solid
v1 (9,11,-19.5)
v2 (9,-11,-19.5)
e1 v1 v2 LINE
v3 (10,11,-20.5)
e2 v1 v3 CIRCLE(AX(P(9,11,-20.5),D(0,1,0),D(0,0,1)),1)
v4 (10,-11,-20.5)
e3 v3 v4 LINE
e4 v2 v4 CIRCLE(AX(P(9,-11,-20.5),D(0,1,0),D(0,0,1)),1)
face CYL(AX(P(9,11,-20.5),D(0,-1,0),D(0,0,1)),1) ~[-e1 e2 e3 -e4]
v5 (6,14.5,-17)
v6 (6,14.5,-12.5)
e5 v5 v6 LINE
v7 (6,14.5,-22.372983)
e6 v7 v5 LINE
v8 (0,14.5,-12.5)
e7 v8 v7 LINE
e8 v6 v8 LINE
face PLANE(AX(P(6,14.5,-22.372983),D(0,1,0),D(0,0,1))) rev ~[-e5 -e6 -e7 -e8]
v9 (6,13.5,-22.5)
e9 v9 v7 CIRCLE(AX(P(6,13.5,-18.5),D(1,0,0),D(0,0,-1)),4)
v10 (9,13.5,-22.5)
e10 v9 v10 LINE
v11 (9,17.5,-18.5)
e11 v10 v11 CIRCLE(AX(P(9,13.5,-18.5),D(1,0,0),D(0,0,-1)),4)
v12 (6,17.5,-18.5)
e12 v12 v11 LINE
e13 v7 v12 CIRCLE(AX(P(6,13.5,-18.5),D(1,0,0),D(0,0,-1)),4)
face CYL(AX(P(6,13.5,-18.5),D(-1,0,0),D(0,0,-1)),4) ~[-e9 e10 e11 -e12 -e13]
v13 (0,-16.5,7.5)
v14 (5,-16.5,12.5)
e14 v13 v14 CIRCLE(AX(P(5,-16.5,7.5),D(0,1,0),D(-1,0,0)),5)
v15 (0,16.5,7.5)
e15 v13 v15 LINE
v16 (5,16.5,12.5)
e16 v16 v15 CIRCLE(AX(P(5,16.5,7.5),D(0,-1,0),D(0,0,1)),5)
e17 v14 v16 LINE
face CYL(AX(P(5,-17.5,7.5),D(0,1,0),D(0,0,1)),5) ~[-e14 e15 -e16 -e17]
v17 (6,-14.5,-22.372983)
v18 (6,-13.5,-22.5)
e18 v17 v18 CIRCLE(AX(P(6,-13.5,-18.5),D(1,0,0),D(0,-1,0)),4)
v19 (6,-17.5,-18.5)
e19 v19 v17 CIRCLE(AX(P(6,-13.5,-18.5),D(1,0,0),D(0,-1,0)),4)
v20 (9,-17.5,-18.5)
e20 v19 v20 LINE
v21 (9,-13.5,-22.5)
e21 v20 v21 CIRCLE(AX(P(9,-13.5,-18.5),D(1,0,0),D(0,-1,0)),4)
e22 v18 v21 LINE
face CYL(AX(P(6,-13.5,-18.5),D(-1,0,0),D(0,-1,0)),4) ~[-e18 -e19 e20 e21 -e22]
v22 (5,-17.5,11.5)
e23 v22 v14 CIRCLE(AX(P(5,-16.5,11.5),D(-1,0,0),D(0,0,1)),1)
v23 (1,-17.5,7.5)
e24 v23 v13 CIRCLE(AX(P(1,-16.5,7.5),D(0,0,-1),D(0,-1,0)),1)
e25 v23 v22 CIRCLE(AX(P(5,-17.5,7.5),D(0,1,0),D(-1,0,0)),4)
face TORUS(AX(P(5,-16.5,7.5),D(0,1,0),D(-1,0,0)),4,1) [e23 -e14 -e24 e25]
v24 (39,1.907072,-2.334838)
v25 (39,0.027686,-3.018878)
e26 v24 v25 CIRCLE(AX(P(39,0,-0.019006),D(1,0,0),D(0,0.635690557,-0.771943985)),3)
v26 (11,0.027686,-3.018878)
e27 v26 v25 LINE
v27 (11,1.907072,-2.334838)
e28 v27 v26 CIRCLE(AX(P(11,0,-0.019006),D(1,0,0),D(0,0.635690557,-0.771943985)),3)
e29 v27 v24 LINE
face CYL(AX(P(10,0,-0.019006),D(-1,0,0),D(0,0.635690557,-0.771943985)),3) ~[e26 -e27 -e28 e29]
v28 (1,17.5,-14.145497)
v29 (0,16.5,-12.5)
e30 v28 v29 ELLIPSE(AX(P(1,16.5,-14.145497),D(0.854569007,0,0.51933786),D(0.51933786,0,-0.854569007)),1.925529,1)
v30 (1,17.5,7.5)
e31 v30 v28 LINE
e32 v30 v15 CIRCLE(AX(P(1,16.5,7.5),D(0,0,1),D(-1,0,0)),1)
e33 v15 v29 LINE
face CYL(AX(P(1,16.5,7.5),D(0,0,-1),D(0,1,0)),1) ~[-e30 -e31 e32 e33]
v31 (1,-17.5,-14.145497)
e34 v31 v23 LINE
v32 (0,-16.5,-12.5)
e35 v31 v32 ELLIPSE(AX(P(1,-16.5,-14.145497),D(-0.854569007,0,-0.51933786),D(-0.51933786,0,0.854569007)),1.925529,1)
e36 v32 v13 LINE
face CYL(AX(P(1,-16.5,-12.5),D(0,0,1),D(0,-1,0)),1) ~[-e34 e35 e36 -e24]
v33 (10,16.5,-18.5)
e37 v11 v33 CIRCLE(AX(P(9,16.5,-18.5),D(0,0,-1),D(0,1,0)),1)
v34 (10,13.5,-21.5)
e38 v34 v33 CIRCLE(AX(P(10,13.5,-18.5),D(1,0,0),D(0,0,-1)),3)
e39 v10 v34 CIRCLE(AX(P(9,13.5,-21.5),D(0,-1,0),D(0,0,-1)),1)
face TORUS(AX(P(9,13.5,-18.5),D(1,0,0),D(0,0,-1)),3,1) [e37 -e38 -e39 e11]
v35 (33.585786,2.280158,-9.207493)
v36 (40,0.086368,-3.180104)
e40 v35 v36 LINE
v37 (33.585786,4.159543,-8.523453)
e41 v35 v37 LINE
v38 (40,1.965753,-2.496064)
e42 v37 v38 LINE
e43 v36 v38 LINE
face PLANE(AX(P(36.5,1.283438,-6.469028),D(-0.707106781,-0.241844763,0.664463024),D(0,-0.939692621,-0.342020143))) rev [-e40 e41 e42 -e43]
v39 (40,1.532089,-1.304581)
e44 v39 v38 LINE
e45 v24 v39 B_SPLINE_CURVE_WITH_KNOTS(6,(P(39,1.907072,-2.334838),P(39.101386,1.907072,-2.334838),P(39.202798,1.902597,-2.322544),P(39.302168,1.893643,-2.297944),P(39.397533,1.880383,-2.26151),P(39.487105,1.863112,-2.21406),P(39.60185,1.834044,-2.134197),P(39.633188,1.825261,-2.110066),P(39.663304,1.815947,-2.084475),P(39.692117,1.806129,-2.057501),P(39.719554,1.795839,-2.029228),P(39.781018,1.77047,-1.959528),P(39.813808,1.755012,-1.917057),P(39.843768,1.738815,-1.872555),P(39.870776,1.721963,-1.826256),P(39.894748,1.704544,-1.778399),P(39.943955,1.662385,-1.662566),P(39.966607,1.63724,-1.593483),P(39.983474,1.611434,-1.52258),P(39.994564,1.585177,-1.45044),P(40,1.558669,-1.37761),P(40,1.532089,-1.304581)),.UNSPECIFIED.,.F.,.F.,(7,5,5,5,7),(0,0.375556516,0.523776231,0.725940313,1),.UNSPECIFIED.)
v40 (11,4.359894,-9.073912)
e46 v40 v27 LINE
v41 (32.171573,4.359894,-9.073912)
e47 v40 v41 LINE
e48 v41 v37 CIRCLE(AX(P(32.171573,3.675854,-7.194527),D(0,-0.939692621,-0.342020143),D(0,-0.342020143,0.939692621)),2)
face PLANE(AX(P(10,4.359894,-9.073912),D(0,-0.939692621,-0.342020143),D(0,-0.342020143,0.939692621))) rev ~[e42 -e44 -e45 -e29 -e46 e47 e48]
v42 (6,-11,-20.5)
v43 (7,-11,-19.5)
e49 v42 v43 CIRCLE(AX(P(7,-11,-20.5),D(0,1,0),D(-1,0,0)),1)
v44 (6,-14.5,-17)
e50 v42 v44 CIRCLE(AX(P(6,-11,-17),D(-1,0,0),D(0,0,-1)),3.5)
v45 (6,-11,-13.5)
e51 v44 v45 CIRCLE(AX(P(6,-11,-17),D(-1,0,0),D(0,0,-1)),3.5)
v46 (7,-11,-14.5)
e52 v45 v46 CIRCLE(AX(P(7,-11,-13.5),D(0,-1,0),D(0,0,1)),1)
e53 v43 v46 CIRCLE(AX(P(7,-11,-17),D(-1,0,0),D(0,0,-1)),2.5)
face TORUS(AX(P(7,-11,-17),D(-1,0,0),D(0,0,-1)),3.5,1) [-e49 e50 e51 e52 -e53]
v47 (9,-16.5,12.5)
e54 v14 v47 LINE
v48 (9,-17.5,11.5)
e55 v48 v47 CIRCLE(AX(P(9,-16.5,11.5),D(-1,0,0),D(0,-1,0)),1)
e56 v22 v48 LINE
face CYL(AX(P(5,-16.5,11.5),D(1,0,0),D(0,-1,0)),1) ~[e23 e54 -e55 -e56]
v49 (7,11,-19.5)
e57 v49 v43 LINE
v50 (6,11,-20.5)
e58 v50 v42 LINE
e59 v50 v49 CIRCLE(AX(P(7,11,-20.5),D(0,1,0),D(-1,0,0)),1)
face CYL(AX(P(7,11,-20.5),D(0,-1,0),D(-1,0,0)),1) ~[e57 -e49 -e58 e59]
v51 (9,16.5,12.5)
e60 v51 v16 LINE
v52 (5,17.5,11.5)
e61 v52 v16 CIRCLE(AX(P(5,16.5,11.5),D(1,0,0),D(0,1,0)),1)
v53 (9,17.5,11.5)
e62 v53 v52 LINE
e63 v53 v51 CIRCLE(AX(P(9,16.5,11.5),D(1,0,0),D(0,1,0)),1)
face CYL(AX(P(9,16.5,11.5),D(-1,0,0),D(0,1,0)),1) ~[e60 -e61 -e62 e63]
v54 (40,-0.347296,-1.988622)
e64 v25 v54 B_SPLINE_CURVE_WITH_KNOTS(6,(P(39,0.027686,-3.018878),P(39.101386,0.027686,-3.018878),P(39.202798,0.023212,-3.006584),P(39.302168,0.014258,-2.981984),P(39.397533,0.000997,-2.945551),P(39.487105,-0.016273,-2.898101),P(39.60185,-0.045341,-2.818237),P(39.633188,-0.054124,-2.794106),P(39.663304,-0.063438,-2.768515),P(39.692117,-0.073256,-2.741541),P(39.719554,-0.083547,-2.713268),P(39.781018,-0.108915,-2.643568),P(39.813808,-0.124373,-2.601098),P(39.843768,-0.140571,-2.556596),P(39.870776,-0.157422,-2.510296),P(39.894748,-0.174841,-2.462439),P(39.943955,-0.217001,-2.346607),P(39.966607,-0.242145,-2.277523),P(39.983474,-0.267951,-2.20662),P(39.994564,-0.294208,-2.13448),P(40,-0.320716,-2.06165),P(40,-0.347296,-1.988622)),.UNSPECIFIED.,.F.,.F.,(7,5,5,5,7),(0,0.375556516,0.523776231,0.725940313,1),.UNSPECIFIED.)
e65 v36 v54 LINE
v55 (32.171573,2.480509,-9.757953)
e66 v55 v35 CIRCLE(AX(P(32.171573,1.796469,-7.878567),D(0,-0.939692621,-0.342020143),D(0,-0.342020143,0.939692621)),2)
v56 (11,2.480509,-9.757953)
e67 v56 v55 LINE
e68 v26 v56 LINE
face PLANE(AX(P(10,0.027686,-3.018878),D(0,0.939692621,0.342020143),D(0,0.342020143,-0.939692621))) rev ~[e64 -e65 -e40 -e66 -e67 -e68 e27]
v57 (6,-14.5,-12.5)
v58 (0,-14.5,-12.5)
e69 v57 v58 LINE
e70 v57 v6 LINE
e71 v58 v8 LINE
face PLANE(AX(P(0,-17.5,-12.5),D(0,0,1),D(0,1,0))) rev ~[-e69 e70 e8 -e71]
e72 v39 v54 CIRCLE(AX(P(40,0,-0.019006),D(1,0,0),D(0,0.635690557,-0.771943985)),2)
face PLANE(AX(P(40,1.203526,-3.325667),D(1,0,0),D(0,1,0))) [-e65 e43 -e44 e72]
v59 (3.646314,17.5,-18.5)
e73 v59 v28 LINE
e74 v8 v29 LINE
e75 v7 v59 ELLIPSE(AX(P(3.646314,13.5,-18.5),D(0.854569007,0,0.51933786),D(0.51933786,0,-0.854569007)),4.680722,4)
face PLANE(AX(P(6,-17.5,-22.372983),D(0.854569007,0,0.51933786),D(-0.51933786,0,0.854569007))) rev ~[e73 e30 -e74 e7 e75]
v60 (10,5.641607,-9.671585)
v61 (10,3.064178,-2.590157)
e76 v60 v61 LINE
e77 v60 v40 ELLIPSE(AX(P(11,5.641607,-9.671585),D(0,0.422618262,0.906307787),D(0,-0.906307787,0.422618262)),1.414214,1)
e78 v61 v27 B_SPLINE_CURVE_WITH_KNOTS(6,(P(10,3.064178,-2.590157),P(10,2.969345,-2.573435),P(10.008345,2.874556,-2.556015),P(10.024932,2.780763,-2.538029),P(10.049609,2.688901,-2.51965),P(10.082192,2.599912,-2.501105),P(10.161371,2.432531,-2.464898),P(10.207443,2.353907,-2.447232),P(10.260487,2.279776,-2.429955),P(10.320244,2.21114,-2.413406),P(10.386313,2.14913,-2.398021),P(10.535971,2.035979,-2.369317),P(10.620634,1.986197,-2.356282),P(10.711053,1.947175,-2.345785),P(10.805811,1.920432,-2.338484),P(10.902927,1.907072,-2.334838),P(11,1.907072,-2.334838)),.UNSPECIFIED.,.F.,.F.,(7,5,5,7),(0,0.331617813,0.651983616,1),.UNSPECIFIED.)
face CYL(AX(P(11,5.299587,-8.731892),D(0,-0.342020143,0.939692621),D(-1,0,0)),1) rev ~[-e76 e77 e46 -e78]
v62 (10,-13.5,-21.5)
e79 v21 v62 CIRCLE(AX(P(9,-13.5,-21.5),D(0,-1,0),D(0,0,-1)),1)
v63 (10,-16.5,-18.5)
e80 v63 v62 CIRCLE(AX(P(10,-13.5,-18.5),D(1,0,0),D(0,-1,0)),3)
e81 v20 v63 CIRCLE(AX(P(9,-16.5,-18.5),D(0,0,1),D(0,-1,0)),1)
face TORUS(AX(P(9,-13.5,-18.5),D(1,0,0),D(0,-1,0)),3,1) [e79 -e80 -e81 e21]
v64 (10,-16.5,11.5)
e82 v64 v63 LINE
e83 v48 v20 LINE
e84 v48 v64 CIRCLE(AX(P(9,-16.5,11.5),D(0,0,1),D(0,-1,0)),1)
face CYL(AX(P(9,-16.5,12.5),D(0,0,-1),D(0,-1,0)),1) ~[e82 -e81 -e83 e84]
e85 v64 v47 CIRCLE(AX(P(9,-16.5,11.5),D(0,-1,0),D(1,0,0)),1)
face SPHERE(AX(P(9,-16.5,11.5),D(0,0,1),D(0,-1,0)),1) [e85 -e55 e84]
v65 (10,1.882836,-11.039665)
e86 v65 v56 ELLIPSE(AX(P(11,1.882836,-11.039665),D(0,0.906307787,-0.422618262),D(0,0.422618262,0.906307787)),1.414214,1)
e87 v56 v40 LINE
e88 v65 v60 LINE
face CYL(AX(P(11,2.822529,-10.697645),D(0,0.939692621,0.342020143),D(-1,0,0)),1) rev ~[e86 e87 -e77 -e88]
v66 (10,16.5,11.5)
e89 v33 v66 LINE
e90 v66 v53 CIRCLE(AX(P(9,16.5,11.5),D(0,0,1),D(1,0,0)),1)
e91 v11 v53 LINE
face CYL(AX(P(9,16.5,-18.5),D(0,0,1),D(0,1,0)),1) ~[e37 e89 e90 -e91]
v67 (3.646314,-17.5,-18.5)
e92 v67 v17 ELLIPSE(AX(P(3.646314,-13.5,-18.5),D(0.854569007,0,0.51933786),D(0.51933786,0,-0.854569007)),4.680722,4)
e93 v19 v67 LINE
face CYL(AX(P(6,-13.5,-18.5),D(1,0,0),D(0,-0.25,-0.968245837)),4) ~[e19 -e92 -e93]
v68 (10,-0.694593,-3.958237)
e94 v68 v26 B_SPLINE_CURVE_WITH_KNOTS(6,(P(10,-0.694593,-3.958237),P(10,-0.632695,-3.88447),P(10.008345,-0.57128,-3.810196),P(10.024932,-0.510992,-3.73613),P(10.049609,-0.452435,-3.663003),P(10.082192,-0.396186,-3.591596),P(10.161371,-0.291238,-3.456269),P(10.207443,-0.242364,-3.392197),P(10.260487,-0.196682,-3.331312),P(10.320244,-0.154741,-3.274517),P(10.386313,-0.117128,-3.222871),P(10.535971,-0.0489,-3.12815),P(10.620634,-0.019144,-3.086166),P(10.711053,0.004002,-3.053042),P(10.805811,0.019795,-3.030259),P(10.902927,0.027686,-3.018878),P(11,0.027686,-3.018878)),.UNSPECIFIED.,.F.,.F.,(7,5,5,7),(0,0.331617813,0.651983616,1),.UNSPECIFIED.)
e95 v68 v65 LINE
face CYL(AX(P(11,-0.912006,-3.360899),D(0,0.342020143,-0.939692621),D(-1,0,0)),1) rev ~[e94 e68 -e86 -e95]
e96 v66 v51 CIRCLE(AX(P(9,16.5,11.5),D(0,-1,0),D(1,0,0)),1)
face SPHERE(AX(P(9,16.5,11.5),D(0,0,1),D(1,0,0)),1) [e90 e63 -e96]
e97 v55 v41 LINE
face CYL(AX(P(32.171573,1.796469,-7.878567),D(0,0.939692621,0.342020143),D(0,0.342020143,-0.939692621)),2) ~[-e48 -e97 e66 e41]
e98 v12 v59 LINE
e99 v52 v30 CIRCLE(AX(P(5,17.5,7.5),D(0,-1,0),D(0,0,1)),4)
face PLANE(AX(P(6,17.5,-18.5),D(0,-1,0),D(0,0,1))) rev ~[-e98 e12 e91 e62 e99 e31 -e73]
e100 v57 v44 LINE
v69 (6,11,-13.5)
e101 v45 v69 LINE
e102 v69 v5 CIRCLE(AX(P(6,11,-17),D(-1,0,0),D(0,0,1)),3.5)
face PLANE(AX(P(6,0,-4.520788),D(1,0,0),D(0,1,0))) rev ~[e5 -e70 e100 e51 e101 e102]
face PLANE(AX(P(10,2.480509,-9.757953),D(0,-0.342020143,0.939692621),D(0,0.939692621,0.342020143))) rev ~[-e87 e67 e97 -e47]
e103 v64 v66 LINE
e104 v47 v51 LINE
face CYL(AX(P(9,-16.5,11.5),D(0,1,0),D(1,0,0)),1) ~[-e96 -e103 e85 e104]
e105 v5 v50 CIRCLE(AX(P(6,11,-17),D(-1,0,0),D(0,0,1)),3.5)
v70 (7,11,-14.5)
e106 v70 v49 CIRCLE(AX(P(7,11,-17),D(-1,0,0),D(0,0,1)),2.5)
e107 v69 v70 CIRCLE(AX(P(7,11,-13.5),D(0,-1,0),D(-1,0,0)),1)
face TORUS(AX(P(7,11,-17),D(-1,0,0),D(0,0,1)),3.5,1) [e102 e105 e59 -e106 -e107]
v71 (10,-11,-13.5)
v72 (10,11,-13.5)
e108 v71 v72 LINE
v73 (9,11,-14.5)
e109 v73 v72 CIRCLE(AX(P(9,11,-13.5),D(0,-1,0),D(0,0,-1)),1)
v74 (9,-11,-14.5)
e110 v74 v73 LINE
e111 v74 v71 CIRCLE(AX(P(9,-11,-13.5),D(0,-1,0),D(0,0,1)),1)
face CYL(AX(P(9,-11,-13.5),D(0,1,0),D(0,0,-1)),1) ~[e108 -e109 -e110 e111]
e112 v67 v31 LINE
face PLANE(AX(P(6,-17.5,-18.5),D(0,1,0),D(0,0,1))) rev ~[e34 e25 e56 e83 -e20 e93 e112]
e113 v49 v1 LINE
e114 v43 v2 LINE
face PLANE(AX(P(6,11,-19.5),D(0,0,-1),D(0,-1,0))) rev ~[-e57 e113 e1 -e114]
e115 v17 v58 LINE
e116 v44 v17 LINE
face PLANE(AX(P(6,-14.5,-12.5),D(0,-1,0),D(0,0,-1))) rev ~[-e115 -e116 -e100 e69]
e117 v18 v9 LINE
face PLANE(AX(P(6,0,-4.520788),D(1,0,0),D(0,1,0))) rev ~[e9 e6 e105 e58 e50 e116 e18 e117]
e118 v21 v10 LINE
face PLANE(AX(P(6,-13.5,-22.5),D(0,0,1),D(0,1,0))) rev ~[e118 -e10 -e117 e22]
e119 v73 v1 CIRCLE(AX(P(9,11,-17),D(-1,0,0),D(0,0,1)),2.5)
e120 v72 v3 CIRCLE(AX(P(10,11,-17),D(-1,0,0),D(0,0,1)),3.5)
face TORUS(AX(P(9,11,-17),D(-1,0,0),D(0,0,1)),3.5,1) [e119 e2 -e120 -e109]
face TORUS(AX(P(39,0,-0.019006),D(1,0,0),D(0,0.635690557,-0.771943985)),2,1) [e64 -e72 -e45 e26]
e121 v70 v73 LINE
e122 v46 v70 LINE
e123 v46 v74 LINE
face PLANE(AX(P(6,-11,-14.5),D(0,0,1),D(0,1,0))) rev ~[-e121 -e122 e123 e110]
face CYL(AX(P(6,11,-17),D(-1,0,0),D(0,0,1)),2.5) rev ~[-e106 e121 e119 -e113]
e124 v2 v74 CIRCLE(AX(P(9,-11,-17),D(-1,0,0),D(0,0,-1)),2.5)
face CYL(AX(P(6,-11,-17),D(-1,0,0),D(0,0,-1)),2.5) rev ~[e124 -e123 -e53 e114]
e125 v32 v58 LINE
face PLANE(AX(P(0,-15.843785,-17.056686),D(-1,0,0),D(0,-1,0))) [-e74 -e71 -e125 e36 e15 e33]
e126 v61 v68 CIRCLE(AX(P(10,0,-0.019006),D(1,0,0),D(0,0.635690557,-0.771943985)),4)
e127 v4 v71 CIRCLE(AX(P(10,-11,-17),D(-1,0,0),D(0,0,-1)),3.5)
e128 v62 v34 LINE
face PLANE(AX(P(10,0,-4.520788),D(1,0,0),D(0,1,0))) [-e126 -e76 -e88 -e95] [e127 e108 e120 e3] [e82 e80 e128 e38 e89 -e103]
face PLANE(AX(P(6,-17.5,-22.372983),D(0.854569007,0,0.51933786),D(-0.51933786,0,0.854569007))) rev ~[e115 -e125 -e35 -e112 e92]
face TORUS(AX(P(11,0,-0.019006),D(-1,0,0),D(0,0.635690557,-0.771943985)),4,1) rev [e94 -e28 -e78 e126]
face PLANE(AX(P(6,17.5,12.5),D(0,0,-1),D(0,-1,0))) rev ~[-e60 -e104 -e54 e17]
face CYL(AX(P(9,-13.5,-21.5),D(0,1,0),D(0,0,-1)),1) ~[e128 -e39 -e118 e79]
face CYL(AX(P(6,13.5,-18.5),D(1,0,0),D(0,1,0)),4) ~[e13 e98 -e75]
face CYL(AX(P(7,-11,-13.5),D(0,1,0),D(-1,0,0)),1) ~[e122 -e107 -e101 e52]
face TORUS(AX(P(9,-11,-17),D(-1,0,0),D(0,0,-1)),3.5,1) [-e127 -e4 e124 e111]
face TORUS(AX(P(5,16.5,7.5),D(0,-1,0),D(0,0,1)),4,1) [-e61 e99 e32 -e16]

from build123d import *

# Parameters (mm, degrees)
F0_W      = 35
F0_H      = 25
F1_DEPTH  = 6
F3_DEPTH  = 4
F4_R      = 1
F6_DEPTH  = 6
F8_DEPTH  = 35.001
F10_DEPTH = 30
F11_SIZE  = 7
F12_R     = 2
F13_R     = 5
F14_R     = 1
F15_R     = 1


with BuildPart() as f1:
    # F0 (on Right) → F1 (new body)
    with BuildSketch(Plane.YZ):
        Rectangle(F0_W, F0_H)
    extrude(amount=F1_DEPTH)

    # F2 (on face) → F3 (join)
    with BuildSketch(Plane.YZ.offset(6)):
        with BuildLine():
            Line((17.5, 12.5), (-17.5, 12.5))
            Line((-17.5, 12.5), (-17.5, -18.5))
            ThreePointArc((-17.5, -18.5), (-16.3284271247, -21.3284271247), (-13.5, -22.5))
            Line((-13.5, -22.5), (13.5, -22.5))
            ThreePointArc((13.5, -22.5), (16.3284271247, -21.3284271247), (17.5, -18.5))
            Line((17.5, -18.5), (17.5, 12.5))
        make_face()
        with BuildLine():
            ThreePointArc((-11, -19.5), (-13.5, -17), (-11, -14.5))
            Line((-11, -14.5), (11, -14.5))
            ThreePointArc((11, -14.5), (13.5, -17), (11, -19.5))
            Line((11, -19.5), (-11, -19.5))
        make_face(mode=Mode.SUBTRACT)
    extrude(amount=F3_DEPTH)

    # F4
    f4_edges = [f1.edges().sort_by_distance(p)[0] for p in [
        (10, -16.328427, -21.328427),
        (10, 0, -19.5),
        (6, 0, -19.5),
    ]]
    fillet(f4_edges, radius=F4_R)

    # F5 (on face) → F6 (join, through all)
    with BuildSketch(Plane(origin=(6, 0, 0), x_dir=(0, -1, 0), z_dir=(-1, 0, 0))):
        with BuildLine():
            Line((17.5, -12.5), (14.5, -12.5))
            Line((14.5, -12.5), (14.5, -22.3729833462))
            ThreePointArc((14.5, -22.3729833462), (16.6622776602, -20.9494897428), (17.5, -18.5))
            Line((17.5, -18.5), (17.5, -12.5))
        make_face()
        with BuildLine():
            Line((-14.5, -12.5), (-17.5, -12.5))
            Line((-17.5, -12.5), (-17.5, -18.5))
            ThreePointArc((-17.5, -18.5), (-16.6622776602, -20.9494897428), (-14.5, -22.3729833462))
            Line((-14.5, -22.3729833462), (-14.5, -12.5))
        make_face()
    extrude(amount=F6_DEPTH)

    # F7 (on face) → F8 (cut, through all)
    with BuildSketch(Plane.XZ.offset(17.5)):
        Polygon((6, -22.3729833462), (0, -12.5), (0, -22.3729833462), align=None)
    extrude(amount=-F8_DEPTH, mode=Mode.SUBTRACT)

    # F9 (on face) → F10 (join)
    with BuildSketch(Plane.YZ.offset(10)):
        with BuildLine():
            Line((4.359894054, -9.0739122182), (1.9070716714, -2.3348381079))
            ThreePointArc((1.9070716714, -2.3348381079), (-1.02606043, 2.8000717087), (0.0276864298, -3.0188783946))
            Line((0.0276864298, -3.0188783946), (2.4805088125, -9.7579525049))
            Line((2.4805088125, -9.7579525049), (4.359894054, -9.0739122182))
        make_face()
    extrude(amount=F10_DEPTH)

    # F11
    f11_edges = [f1.edges().sort_by_distance(p)[0] for p in [
        (40, 3.420201, -9.415932),
    ]]
    chamfer(f11_edges, length=F11_SIZE)

    # F12
    f12_edges = [f1.edges().sort_by_distance(p)[0] for p in [
        (33, 3.420201, -9.415932),
    ]]
    fillet(f12_edges, radius=F12_R)

    # F13
    f13_edges = [f1.edges().sort_by_distance(p)[0] for p in [
        (0, 0, 12.5),
    ]]
    fillet(f13_edges, radius=F13_R)

    # F14
    f14_edges = [f1.edges().sort_by_distance(p)[0] for p in [
        (0, 17.5, -2.5),
    ]]
    fillet(f14_edges, radius=F14_R)

    # F15
    f15_edges = [f1.edges().sort_by_distance(p)[0] for p in [
        (10, 3.133483, -5.704375),
        (10, -1.02606, 2.800072),
        (10, 3.420201, -9.415932),
        (10, 1.254098, -6.388415),
        (40, -1.02606, 2.800072),
    ]]
    fillet(f15_edges, radius=F15_R)


solid = f1.part
